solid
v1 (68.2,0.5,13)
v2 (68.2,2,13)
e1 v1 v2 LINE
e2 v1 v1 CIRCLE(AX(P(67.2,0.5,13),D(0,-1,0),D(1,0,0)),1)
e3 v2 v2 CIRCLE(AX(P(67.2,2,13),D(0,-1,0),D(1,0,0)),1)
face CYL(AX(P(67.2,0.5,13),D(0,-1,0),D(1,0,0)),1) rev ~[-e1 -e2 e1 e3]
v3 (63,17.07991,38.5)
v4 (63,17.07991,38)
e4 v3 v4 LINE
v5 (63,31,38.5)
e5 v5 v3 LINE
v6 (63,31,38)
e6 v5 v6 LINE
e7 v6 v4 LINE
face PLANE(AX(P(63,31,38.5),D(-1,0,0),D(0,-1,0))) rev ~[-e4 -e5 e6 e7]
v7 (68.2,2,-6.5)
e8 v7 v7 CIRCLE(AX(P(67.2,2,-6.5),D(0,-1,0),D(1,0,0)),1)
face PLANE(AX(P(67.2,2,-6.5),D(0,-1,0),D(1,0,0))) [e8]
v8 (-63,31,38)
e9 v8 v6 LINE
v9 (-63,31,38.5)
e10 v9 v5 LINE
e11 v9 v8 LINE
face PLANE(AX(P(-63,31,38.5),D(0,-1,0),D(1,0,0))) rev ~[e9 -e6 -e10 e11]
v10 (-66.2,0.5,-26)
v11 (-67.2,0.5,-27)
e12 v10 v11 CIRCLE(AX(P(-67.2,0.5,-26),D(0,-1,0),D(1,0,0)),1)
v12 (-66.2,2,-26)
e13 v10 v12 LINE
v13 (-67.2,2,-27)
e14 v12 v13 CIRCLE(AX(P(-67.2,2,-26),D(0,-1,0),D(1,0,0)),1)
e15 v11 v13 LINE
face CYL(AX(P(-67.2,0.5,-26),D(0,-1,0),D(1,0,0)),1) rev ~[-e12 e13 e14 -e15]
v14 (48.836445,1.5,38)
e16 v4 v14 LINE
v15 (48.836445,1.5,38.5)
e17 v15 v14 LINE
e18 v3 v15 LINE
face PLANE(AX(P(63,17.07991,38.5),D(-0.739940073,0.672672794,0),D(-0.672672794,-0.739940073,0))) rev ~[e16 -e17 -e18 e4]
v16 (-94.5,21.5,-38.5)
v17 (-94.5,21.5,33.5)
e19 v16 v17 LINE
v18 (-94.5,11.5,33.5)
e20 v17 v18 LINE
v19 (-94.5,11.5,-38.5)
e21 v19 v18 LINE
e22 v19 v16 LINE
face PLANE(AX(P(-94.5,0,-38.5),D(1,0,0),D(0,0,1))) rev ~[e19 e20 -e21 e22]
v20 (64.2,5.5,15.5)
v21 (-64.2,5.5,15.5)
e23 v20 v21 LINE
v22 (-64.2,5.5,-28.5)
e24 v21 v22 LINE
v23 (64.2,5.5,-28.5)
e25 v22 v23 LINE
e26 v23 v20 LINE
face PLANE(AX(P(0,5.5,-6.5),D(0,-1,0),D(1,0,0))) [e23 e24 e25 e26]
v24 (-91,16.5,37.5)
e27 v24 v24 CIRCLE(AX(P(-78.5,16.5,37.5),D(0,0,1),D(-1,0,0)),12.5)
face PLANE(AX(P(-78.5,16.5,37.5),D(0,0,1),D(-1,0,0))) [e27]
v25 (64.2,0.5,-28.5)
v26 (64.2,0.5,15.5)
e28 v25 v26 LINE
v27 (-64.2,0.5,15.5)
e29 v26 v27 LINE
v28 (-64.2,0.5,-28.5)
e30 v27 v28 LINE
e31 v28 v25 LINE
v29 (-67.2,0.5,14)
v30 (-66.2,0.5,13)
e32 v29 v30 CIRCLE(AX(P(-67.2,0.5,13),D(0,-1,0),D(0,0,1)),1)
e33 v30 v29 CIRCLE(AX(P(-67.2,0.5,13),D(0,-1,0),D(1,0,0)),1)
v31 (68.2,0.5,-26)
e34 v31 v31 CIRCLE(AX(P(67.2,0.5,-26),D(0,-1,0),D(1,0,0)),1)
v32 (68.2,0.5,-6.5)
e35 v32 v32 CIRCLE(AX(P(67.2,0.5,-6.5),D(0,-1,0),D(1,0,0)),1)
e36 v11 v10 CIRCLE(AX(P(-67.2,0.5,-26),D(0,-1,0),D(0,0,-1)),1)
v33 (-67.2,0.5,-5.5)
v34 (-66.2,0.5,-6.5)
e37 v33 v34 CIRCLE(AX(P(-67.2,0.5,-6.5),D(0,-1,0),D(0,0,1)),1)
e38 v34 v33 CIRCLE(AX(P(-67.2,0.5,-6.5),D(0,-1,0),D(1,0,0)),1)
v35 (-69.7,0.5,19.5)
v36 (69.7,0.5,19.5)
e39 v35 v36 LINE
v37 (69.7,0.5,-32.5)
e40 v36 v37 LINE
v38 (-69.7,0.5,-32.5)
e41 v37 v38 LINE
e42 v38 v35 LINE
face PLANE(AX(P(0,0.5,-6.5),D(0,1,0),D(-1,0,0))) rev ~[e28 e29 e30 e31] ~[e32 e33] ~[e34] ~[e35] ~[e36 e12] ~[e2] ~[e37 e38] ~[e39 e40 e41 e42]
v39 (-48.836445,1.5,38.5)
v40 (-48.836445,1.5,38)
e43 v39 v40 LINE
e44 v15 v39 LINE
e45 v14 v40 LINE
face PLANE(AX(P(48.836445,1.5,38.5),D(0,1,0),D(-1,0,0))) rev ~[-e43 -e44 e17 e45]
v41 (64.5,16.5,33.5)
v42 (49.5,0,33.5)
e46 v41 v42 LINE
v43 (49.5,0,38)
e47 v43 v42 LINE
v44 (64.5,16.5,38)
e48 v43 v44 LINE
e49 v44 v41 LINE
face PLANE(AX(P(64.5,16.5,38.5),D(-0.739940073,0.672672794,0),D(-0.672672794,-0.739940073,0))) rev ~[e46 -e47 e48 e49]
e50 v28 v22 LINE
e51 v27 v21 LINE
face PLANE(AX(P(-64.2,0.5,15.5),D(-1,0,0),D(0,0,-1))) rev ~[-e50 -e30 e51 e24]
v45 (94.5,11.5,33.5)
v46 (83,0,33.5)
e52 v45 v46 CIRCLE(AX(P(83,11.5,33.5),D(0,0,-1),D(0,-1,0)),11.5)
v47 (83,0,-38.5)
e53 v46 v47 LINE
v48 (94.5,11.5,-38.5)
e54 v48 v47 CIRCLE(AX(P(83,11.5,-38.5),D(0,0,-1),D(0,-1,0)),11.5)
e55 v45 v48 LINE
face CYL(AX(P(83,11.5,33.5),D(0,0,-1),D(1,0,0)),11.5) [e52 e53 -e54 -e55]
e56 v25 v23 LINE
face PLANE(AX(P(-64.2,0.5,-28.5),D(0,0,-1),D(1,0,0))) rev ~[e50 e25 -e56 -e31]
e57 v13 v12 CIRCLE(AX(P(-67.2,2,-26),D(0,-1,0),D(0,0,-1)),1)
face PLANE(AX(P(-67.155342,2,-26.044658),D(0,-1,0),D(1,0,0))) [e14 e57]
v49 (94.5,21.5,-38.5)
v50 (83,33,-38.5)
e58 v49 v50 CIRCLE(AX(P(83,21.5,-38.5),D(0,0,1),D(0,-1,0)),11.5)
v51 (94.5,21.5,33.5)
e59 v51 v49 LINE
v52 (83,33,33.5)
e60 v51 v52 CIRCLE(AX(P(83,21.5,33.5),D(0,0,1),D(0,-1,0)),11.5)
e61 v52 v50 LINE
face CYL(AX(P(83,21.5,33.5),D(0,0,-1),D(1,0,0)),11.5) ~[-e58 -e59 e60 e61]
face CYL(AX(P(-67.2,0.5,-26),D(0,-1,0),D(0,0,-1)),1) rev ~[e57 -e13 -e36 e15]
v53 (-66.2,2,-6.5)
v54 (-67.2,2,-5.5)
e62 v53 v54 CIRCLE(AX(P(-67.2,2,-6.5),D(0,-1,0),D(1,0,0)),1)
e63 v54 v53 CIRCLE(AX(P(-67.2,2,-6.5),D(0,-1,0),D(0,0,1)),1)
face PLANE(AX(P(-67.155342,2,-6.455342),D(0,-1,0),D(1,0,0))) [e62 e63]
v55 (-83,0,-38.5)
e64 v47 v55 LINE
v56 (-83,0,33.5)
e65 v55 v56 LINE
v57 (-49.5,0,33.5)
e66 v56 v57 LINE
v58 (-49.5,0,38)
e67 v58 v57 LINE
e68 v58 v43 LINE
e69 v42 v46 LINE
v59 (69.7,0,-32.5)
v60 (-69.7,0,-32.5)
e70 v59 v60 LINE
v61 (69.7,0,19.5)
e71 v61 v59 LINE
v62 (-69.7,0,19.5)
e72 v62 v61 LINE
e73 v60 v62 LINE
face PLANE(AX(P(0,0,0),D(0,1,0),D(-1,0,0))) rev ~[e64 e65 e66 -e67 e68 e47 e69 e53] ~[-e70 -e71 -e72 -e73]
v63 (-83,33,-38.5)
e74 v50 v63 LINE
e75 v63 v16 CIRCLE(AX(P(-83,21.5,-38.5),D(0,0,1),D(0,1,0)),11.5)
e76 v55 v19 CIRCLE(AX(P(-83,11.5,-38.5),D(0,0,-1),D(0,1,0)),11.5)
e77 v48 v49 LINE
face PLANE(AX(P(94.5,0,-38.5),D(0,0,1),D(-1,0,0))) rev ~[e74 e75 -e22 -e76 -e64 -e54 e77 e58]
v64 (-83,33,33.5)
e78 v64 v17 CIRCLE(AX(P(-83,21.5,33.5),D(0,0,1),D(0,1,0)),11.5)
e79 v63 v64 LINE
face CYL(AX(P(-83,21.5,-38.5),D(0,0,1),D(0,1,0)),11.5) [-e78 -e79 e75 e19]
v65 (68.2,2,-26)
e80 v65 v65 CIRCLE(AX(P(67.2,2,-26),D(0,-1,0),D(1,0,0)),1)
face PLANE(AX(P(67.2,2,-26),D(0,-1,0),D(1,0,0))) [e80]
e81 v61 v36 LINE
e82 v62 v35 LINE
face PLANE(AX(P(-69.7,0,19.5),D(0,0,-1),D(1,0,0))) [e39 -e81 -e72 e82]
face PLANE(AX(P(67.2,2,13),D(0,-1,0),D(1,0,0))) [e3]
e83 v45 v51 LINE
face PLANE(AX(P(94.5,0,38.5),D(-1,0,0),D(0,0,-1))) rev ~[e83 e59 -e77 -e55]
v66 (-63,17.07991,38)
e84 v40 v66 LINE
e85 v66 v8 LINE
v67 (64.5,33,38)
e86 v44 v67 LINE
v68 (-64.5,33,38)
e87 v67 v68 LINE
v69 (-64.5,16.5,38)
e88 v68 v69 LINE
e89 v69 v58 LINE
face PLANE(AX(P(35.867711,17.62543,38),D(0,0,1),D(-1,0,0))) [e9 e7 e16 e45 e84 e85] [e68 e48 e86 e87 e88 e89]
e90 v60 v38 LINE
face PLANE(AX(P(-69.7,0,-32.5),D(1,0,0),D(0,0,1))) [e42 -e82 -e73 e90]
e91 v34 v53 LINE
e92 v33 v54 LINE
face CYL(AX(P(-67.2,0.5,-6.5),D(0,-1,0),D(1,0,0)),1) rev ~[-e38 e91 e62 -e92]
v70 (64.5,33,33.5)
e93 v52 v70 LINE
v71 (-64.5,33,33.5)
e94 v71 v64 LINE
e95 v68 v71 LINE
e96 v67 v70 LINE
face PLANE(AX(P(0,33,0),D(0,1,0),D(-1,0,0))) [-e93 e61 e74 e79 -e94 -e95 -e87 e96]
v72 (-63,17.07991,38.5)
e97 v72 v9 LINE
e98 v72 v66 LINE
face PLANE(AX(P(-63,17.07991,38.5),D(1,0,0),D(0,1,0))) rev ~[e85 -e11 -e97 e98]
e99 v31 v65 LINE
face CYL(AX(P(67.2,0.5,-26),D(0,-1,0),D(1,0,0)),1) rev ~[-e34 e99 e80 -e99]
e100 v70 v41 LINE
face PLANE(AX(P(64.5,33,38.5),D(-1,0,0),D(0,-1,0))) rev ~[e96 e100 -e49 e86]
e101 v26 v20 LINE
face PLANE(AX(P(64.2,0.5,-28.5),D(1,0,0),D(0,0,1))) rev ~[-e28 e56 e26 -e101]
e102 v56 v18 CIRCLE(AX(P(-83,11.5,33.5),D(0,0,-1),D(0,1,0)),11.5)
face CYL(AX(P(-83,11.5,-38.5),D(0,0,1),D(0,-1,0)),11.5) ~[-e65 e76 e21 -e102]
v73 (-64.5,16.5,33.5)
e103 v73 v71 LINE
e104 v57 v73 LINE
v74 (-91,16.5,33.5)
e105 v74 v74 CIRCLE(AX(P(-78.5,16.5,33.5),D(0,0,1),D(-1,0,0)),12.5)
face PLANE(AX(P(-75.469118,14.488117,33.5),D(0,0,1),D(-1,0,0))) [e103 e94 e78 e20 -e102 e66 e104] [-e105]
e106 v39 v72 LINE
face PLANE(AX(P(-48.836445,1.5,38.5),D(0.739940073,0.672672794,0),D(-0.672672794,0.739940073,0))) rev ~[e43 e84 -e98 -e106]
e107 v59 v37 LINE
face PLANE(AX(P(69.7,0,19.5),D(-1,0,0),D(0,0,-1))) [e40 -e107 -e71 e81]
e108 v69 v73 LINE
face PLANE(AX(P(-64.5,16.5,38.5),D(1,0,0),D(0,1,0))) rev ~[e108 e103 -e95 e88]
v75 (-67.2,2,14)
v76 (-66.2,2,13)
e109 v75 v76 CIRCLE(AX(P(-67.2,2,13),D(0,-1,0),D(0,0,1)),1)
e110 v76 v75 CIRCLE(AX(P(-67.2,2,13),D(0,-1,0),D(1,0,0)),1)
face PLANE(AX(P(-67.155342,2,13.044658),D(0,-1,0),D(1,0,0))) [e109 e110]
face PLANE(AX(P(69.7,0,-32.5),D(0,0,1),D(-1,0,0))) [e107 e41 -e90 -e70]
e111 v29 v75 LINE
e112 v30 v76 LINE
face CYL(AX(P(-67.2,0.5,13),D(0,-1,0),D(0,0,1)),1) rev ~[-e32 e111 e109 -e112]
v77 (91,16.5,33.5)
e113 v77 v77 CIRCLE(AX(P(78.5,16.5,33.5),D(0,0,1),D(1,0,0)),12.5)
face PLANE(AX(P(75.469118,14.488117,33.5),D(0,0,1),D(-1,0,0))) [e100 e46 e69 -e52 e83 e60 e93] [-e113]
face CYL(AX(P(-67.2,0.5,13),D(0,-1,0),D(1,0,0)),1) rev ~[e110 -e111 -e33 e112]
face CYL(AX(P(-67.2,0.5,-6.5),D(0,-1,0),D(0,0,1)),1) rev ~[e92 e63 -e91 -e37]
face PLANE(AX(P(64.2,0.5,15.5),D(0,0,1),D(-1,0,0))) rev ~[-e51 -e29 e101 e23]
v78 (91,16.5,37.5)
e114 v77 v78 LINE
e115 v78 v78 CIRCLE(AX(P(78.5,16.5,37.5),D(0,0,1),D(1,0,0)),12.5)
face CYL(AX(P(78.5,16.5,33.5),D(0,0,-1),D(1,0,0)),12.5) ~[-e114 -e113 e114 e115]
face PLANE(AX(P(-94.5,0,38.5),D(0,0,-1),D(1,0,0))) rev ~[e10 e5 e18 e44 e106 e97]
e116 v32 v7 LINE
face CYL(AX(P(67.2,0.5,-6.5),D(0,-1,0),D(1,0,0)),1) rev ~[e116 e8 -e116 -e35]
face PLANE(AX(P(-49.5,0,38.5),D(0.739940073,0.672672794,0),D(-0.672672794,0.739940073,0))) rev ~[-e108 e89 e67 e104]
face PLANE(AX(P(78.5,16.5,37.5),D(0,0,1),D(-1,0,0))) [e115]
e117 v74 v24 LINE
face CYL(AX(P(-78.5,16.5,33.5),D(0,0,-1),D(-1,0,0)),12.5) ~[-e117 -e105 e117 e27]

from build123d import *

# Parameters (mm, degrees)
F1_DEPTH  = 33
F3_DEPTH  = 5
F4_R      = 12.5
F5_DEPTH  = 4
F7_DEPTH  = 0.5
F8_R      = 11.5
F9_R      = 11.5
F11_DEPTH = 0.5
F13_DEPTH = 5
F12_R     = 1
F14_DEPTH = 1.5
F15_ANGLE = 180


with BuildPart() as f1:
    # F0 (on Front) → F1 (new body)
    with BuildSketch(Plane.XZ):
        Polygon((64.5, 38.5), (0, 38.5), (-64.5, 38.5), (-94.5, 38.5), (-94.5, 0), (-94.5, -38.5), (0, -38.5), (94.5, -38.5), (94.5, 0), (94.5, 38.5), align=None)
    extrude(amount=F1_DEPTH)

    # F2 (on face) → F3 (cut)
    with BuildSketch(Plane.XY.offset(38.5)):
        Polygon((-64.5, 0), (-94.5, 0), (-94.5, -16.5), (-94.5, -33), (-64.5, -33), (-64.5, -16.5), (-49.5, 0), align=None)
        Polygon((49.5, 0), (64.5, -16.5), (64.5, -33), (94.5, -33), (94.5, 0), (64.5, 0), align=None)
    extrude(amount=-F3_DEPTH, mode=Mode.SUBTRACT)

    # F4 (on face) → F5 (join)
    with BuildSketch(Plane.XY.offset(33.5)):
        with BuildLine():
            ThreePointArc((-66, -16.5), (-78.5, -4), (-91, -16.5))
            ThreePointArc((-91, -16.5), (-78.5, -29), (-66, -16.5))
        make_face()
        with Locations((78.5, -16.5)):
            Circle(F4_R)
    extrude(amount=F5_DEPTH)

    # F6 (on face) → F7 (cut)
    with BuildSketch(Plane.XY.offset(38.5)):
        Polygon((0, -1.5), (0, 0), (-49.5, 0), (-64.5, -16.5), (-64.5, -33), (0, -33), (0, -31), (-63, -31), (-63, -17.0799103121), (-48.8364451708, -1.5), align=None)
        Polygon((49.5, 0), (0, 0), (0, -1.5), (48.8364451708, -1.5), (63, -17.0799103121), (63, -31), (0, -31), (0, -33), (64.5, -33), (64.5, -16.5), align=None)
    extrude(amount=-F7_DEPTH, mode=Mode.SUBTRACT)

    # F8
    f8_edges = [f1.edges().sort_by_distance(p)[0] for p in [
        (-94.5, -33, -2.5),
    ]]
    fillet(f8_edges, radius=F8_R)

    # F9
    f9_edges = [f1.edges().sort_by_distance(p)[0] for p in [
        (-94.5, 0, -2.5),
        (94.5, 0, -2.5),
        (94.5, -33, -2.5),
    ]]
    fillet(f9_edges, radius=F9_R)

    # F10 (on Front) → F11 (cut)
    with BuildSketch(Plane.XZ):
        Polygon((69.7, -32.5), (69.7, 0), (69.7, 19.5), (0, 19.5), (-69.7, 19.5), (-69.7, 0), (-69.7, -32.5), (0, -32.5), align=None)
    extrude(amount=F11_DEPTH, mode=Mode.SUBTRACT)

    # F12 (on face) → F13 (cut)
    with BuildSketch(Plane(origin=(0, -0.5, 0), x_dir=(-1, 0, 0), z_dir=(0, 1, 0))):
        Polygon((-64.2, 15.5), (-64.2, 0), (-64.2, -28.5), (-48.5950261354, -28.5), (64.2, -28.5), (64.2, 15.5), (-38.0094833672, 15.5), align=None)
    extrude(amount=-F13_DEPTH, mode=Mode.SUBTRACT)

    # F12 (on face) → F14 (cut)
    with BuildSketch(Plane(origin=(0, -0.5, 0), x_dir=(-1, 0, 0), z_dir=(0, 1, 0))):
        with BuildLine():
            ThreePointArc((-66.2, 13), (-66.4928932188, 13.7071067812), (-67.2, 14))
            ThreePointArc((-67.2, 14), (-67.9071067812, 12.2928932188), (-66.2, 13))
        make_face()
        with BuildLine():
            ThreePointArc((-66.2, -6.5), (-66.4928932188, -5.7928932188), (-67.2, -5.5))
            ThreePointArc((-67.2, -5.5), (-67.9071067812, -7.2071067812), (-66.2, -6.5))
        make_face()
        with Locations((67.2, -26)):
            Circle(F12_R)
        with Locations((67.2, -6.5)):
            Circle(F12_R)
        with Locations((67.2, 13)):
            Circle(F12_R)
        with BuildLine():
            ThreePointArc((-66.2, -26), (-67.9071067812, -25.2928932188), (-67.2, -27))
            ThreePointArc((-67.2, -27), (-66.4928932188, -26.7071067812), (-66.2, -26))
        make_face()
    extrude(amount=-F14_DEPTH, mode=Mode.SUBTRACT)


with BuildPart() as f1_1:
    # F15: moved
    add(f1.part.rotate(Axis((83, 0, -2.5), (0, 0, 1)), F15_ANGLE))


with BuildPart() as f1_2:
    # F16: moved
    add(f1_1.part.moved(Location((-166, 0, 0))))


solid = f1_2.part
